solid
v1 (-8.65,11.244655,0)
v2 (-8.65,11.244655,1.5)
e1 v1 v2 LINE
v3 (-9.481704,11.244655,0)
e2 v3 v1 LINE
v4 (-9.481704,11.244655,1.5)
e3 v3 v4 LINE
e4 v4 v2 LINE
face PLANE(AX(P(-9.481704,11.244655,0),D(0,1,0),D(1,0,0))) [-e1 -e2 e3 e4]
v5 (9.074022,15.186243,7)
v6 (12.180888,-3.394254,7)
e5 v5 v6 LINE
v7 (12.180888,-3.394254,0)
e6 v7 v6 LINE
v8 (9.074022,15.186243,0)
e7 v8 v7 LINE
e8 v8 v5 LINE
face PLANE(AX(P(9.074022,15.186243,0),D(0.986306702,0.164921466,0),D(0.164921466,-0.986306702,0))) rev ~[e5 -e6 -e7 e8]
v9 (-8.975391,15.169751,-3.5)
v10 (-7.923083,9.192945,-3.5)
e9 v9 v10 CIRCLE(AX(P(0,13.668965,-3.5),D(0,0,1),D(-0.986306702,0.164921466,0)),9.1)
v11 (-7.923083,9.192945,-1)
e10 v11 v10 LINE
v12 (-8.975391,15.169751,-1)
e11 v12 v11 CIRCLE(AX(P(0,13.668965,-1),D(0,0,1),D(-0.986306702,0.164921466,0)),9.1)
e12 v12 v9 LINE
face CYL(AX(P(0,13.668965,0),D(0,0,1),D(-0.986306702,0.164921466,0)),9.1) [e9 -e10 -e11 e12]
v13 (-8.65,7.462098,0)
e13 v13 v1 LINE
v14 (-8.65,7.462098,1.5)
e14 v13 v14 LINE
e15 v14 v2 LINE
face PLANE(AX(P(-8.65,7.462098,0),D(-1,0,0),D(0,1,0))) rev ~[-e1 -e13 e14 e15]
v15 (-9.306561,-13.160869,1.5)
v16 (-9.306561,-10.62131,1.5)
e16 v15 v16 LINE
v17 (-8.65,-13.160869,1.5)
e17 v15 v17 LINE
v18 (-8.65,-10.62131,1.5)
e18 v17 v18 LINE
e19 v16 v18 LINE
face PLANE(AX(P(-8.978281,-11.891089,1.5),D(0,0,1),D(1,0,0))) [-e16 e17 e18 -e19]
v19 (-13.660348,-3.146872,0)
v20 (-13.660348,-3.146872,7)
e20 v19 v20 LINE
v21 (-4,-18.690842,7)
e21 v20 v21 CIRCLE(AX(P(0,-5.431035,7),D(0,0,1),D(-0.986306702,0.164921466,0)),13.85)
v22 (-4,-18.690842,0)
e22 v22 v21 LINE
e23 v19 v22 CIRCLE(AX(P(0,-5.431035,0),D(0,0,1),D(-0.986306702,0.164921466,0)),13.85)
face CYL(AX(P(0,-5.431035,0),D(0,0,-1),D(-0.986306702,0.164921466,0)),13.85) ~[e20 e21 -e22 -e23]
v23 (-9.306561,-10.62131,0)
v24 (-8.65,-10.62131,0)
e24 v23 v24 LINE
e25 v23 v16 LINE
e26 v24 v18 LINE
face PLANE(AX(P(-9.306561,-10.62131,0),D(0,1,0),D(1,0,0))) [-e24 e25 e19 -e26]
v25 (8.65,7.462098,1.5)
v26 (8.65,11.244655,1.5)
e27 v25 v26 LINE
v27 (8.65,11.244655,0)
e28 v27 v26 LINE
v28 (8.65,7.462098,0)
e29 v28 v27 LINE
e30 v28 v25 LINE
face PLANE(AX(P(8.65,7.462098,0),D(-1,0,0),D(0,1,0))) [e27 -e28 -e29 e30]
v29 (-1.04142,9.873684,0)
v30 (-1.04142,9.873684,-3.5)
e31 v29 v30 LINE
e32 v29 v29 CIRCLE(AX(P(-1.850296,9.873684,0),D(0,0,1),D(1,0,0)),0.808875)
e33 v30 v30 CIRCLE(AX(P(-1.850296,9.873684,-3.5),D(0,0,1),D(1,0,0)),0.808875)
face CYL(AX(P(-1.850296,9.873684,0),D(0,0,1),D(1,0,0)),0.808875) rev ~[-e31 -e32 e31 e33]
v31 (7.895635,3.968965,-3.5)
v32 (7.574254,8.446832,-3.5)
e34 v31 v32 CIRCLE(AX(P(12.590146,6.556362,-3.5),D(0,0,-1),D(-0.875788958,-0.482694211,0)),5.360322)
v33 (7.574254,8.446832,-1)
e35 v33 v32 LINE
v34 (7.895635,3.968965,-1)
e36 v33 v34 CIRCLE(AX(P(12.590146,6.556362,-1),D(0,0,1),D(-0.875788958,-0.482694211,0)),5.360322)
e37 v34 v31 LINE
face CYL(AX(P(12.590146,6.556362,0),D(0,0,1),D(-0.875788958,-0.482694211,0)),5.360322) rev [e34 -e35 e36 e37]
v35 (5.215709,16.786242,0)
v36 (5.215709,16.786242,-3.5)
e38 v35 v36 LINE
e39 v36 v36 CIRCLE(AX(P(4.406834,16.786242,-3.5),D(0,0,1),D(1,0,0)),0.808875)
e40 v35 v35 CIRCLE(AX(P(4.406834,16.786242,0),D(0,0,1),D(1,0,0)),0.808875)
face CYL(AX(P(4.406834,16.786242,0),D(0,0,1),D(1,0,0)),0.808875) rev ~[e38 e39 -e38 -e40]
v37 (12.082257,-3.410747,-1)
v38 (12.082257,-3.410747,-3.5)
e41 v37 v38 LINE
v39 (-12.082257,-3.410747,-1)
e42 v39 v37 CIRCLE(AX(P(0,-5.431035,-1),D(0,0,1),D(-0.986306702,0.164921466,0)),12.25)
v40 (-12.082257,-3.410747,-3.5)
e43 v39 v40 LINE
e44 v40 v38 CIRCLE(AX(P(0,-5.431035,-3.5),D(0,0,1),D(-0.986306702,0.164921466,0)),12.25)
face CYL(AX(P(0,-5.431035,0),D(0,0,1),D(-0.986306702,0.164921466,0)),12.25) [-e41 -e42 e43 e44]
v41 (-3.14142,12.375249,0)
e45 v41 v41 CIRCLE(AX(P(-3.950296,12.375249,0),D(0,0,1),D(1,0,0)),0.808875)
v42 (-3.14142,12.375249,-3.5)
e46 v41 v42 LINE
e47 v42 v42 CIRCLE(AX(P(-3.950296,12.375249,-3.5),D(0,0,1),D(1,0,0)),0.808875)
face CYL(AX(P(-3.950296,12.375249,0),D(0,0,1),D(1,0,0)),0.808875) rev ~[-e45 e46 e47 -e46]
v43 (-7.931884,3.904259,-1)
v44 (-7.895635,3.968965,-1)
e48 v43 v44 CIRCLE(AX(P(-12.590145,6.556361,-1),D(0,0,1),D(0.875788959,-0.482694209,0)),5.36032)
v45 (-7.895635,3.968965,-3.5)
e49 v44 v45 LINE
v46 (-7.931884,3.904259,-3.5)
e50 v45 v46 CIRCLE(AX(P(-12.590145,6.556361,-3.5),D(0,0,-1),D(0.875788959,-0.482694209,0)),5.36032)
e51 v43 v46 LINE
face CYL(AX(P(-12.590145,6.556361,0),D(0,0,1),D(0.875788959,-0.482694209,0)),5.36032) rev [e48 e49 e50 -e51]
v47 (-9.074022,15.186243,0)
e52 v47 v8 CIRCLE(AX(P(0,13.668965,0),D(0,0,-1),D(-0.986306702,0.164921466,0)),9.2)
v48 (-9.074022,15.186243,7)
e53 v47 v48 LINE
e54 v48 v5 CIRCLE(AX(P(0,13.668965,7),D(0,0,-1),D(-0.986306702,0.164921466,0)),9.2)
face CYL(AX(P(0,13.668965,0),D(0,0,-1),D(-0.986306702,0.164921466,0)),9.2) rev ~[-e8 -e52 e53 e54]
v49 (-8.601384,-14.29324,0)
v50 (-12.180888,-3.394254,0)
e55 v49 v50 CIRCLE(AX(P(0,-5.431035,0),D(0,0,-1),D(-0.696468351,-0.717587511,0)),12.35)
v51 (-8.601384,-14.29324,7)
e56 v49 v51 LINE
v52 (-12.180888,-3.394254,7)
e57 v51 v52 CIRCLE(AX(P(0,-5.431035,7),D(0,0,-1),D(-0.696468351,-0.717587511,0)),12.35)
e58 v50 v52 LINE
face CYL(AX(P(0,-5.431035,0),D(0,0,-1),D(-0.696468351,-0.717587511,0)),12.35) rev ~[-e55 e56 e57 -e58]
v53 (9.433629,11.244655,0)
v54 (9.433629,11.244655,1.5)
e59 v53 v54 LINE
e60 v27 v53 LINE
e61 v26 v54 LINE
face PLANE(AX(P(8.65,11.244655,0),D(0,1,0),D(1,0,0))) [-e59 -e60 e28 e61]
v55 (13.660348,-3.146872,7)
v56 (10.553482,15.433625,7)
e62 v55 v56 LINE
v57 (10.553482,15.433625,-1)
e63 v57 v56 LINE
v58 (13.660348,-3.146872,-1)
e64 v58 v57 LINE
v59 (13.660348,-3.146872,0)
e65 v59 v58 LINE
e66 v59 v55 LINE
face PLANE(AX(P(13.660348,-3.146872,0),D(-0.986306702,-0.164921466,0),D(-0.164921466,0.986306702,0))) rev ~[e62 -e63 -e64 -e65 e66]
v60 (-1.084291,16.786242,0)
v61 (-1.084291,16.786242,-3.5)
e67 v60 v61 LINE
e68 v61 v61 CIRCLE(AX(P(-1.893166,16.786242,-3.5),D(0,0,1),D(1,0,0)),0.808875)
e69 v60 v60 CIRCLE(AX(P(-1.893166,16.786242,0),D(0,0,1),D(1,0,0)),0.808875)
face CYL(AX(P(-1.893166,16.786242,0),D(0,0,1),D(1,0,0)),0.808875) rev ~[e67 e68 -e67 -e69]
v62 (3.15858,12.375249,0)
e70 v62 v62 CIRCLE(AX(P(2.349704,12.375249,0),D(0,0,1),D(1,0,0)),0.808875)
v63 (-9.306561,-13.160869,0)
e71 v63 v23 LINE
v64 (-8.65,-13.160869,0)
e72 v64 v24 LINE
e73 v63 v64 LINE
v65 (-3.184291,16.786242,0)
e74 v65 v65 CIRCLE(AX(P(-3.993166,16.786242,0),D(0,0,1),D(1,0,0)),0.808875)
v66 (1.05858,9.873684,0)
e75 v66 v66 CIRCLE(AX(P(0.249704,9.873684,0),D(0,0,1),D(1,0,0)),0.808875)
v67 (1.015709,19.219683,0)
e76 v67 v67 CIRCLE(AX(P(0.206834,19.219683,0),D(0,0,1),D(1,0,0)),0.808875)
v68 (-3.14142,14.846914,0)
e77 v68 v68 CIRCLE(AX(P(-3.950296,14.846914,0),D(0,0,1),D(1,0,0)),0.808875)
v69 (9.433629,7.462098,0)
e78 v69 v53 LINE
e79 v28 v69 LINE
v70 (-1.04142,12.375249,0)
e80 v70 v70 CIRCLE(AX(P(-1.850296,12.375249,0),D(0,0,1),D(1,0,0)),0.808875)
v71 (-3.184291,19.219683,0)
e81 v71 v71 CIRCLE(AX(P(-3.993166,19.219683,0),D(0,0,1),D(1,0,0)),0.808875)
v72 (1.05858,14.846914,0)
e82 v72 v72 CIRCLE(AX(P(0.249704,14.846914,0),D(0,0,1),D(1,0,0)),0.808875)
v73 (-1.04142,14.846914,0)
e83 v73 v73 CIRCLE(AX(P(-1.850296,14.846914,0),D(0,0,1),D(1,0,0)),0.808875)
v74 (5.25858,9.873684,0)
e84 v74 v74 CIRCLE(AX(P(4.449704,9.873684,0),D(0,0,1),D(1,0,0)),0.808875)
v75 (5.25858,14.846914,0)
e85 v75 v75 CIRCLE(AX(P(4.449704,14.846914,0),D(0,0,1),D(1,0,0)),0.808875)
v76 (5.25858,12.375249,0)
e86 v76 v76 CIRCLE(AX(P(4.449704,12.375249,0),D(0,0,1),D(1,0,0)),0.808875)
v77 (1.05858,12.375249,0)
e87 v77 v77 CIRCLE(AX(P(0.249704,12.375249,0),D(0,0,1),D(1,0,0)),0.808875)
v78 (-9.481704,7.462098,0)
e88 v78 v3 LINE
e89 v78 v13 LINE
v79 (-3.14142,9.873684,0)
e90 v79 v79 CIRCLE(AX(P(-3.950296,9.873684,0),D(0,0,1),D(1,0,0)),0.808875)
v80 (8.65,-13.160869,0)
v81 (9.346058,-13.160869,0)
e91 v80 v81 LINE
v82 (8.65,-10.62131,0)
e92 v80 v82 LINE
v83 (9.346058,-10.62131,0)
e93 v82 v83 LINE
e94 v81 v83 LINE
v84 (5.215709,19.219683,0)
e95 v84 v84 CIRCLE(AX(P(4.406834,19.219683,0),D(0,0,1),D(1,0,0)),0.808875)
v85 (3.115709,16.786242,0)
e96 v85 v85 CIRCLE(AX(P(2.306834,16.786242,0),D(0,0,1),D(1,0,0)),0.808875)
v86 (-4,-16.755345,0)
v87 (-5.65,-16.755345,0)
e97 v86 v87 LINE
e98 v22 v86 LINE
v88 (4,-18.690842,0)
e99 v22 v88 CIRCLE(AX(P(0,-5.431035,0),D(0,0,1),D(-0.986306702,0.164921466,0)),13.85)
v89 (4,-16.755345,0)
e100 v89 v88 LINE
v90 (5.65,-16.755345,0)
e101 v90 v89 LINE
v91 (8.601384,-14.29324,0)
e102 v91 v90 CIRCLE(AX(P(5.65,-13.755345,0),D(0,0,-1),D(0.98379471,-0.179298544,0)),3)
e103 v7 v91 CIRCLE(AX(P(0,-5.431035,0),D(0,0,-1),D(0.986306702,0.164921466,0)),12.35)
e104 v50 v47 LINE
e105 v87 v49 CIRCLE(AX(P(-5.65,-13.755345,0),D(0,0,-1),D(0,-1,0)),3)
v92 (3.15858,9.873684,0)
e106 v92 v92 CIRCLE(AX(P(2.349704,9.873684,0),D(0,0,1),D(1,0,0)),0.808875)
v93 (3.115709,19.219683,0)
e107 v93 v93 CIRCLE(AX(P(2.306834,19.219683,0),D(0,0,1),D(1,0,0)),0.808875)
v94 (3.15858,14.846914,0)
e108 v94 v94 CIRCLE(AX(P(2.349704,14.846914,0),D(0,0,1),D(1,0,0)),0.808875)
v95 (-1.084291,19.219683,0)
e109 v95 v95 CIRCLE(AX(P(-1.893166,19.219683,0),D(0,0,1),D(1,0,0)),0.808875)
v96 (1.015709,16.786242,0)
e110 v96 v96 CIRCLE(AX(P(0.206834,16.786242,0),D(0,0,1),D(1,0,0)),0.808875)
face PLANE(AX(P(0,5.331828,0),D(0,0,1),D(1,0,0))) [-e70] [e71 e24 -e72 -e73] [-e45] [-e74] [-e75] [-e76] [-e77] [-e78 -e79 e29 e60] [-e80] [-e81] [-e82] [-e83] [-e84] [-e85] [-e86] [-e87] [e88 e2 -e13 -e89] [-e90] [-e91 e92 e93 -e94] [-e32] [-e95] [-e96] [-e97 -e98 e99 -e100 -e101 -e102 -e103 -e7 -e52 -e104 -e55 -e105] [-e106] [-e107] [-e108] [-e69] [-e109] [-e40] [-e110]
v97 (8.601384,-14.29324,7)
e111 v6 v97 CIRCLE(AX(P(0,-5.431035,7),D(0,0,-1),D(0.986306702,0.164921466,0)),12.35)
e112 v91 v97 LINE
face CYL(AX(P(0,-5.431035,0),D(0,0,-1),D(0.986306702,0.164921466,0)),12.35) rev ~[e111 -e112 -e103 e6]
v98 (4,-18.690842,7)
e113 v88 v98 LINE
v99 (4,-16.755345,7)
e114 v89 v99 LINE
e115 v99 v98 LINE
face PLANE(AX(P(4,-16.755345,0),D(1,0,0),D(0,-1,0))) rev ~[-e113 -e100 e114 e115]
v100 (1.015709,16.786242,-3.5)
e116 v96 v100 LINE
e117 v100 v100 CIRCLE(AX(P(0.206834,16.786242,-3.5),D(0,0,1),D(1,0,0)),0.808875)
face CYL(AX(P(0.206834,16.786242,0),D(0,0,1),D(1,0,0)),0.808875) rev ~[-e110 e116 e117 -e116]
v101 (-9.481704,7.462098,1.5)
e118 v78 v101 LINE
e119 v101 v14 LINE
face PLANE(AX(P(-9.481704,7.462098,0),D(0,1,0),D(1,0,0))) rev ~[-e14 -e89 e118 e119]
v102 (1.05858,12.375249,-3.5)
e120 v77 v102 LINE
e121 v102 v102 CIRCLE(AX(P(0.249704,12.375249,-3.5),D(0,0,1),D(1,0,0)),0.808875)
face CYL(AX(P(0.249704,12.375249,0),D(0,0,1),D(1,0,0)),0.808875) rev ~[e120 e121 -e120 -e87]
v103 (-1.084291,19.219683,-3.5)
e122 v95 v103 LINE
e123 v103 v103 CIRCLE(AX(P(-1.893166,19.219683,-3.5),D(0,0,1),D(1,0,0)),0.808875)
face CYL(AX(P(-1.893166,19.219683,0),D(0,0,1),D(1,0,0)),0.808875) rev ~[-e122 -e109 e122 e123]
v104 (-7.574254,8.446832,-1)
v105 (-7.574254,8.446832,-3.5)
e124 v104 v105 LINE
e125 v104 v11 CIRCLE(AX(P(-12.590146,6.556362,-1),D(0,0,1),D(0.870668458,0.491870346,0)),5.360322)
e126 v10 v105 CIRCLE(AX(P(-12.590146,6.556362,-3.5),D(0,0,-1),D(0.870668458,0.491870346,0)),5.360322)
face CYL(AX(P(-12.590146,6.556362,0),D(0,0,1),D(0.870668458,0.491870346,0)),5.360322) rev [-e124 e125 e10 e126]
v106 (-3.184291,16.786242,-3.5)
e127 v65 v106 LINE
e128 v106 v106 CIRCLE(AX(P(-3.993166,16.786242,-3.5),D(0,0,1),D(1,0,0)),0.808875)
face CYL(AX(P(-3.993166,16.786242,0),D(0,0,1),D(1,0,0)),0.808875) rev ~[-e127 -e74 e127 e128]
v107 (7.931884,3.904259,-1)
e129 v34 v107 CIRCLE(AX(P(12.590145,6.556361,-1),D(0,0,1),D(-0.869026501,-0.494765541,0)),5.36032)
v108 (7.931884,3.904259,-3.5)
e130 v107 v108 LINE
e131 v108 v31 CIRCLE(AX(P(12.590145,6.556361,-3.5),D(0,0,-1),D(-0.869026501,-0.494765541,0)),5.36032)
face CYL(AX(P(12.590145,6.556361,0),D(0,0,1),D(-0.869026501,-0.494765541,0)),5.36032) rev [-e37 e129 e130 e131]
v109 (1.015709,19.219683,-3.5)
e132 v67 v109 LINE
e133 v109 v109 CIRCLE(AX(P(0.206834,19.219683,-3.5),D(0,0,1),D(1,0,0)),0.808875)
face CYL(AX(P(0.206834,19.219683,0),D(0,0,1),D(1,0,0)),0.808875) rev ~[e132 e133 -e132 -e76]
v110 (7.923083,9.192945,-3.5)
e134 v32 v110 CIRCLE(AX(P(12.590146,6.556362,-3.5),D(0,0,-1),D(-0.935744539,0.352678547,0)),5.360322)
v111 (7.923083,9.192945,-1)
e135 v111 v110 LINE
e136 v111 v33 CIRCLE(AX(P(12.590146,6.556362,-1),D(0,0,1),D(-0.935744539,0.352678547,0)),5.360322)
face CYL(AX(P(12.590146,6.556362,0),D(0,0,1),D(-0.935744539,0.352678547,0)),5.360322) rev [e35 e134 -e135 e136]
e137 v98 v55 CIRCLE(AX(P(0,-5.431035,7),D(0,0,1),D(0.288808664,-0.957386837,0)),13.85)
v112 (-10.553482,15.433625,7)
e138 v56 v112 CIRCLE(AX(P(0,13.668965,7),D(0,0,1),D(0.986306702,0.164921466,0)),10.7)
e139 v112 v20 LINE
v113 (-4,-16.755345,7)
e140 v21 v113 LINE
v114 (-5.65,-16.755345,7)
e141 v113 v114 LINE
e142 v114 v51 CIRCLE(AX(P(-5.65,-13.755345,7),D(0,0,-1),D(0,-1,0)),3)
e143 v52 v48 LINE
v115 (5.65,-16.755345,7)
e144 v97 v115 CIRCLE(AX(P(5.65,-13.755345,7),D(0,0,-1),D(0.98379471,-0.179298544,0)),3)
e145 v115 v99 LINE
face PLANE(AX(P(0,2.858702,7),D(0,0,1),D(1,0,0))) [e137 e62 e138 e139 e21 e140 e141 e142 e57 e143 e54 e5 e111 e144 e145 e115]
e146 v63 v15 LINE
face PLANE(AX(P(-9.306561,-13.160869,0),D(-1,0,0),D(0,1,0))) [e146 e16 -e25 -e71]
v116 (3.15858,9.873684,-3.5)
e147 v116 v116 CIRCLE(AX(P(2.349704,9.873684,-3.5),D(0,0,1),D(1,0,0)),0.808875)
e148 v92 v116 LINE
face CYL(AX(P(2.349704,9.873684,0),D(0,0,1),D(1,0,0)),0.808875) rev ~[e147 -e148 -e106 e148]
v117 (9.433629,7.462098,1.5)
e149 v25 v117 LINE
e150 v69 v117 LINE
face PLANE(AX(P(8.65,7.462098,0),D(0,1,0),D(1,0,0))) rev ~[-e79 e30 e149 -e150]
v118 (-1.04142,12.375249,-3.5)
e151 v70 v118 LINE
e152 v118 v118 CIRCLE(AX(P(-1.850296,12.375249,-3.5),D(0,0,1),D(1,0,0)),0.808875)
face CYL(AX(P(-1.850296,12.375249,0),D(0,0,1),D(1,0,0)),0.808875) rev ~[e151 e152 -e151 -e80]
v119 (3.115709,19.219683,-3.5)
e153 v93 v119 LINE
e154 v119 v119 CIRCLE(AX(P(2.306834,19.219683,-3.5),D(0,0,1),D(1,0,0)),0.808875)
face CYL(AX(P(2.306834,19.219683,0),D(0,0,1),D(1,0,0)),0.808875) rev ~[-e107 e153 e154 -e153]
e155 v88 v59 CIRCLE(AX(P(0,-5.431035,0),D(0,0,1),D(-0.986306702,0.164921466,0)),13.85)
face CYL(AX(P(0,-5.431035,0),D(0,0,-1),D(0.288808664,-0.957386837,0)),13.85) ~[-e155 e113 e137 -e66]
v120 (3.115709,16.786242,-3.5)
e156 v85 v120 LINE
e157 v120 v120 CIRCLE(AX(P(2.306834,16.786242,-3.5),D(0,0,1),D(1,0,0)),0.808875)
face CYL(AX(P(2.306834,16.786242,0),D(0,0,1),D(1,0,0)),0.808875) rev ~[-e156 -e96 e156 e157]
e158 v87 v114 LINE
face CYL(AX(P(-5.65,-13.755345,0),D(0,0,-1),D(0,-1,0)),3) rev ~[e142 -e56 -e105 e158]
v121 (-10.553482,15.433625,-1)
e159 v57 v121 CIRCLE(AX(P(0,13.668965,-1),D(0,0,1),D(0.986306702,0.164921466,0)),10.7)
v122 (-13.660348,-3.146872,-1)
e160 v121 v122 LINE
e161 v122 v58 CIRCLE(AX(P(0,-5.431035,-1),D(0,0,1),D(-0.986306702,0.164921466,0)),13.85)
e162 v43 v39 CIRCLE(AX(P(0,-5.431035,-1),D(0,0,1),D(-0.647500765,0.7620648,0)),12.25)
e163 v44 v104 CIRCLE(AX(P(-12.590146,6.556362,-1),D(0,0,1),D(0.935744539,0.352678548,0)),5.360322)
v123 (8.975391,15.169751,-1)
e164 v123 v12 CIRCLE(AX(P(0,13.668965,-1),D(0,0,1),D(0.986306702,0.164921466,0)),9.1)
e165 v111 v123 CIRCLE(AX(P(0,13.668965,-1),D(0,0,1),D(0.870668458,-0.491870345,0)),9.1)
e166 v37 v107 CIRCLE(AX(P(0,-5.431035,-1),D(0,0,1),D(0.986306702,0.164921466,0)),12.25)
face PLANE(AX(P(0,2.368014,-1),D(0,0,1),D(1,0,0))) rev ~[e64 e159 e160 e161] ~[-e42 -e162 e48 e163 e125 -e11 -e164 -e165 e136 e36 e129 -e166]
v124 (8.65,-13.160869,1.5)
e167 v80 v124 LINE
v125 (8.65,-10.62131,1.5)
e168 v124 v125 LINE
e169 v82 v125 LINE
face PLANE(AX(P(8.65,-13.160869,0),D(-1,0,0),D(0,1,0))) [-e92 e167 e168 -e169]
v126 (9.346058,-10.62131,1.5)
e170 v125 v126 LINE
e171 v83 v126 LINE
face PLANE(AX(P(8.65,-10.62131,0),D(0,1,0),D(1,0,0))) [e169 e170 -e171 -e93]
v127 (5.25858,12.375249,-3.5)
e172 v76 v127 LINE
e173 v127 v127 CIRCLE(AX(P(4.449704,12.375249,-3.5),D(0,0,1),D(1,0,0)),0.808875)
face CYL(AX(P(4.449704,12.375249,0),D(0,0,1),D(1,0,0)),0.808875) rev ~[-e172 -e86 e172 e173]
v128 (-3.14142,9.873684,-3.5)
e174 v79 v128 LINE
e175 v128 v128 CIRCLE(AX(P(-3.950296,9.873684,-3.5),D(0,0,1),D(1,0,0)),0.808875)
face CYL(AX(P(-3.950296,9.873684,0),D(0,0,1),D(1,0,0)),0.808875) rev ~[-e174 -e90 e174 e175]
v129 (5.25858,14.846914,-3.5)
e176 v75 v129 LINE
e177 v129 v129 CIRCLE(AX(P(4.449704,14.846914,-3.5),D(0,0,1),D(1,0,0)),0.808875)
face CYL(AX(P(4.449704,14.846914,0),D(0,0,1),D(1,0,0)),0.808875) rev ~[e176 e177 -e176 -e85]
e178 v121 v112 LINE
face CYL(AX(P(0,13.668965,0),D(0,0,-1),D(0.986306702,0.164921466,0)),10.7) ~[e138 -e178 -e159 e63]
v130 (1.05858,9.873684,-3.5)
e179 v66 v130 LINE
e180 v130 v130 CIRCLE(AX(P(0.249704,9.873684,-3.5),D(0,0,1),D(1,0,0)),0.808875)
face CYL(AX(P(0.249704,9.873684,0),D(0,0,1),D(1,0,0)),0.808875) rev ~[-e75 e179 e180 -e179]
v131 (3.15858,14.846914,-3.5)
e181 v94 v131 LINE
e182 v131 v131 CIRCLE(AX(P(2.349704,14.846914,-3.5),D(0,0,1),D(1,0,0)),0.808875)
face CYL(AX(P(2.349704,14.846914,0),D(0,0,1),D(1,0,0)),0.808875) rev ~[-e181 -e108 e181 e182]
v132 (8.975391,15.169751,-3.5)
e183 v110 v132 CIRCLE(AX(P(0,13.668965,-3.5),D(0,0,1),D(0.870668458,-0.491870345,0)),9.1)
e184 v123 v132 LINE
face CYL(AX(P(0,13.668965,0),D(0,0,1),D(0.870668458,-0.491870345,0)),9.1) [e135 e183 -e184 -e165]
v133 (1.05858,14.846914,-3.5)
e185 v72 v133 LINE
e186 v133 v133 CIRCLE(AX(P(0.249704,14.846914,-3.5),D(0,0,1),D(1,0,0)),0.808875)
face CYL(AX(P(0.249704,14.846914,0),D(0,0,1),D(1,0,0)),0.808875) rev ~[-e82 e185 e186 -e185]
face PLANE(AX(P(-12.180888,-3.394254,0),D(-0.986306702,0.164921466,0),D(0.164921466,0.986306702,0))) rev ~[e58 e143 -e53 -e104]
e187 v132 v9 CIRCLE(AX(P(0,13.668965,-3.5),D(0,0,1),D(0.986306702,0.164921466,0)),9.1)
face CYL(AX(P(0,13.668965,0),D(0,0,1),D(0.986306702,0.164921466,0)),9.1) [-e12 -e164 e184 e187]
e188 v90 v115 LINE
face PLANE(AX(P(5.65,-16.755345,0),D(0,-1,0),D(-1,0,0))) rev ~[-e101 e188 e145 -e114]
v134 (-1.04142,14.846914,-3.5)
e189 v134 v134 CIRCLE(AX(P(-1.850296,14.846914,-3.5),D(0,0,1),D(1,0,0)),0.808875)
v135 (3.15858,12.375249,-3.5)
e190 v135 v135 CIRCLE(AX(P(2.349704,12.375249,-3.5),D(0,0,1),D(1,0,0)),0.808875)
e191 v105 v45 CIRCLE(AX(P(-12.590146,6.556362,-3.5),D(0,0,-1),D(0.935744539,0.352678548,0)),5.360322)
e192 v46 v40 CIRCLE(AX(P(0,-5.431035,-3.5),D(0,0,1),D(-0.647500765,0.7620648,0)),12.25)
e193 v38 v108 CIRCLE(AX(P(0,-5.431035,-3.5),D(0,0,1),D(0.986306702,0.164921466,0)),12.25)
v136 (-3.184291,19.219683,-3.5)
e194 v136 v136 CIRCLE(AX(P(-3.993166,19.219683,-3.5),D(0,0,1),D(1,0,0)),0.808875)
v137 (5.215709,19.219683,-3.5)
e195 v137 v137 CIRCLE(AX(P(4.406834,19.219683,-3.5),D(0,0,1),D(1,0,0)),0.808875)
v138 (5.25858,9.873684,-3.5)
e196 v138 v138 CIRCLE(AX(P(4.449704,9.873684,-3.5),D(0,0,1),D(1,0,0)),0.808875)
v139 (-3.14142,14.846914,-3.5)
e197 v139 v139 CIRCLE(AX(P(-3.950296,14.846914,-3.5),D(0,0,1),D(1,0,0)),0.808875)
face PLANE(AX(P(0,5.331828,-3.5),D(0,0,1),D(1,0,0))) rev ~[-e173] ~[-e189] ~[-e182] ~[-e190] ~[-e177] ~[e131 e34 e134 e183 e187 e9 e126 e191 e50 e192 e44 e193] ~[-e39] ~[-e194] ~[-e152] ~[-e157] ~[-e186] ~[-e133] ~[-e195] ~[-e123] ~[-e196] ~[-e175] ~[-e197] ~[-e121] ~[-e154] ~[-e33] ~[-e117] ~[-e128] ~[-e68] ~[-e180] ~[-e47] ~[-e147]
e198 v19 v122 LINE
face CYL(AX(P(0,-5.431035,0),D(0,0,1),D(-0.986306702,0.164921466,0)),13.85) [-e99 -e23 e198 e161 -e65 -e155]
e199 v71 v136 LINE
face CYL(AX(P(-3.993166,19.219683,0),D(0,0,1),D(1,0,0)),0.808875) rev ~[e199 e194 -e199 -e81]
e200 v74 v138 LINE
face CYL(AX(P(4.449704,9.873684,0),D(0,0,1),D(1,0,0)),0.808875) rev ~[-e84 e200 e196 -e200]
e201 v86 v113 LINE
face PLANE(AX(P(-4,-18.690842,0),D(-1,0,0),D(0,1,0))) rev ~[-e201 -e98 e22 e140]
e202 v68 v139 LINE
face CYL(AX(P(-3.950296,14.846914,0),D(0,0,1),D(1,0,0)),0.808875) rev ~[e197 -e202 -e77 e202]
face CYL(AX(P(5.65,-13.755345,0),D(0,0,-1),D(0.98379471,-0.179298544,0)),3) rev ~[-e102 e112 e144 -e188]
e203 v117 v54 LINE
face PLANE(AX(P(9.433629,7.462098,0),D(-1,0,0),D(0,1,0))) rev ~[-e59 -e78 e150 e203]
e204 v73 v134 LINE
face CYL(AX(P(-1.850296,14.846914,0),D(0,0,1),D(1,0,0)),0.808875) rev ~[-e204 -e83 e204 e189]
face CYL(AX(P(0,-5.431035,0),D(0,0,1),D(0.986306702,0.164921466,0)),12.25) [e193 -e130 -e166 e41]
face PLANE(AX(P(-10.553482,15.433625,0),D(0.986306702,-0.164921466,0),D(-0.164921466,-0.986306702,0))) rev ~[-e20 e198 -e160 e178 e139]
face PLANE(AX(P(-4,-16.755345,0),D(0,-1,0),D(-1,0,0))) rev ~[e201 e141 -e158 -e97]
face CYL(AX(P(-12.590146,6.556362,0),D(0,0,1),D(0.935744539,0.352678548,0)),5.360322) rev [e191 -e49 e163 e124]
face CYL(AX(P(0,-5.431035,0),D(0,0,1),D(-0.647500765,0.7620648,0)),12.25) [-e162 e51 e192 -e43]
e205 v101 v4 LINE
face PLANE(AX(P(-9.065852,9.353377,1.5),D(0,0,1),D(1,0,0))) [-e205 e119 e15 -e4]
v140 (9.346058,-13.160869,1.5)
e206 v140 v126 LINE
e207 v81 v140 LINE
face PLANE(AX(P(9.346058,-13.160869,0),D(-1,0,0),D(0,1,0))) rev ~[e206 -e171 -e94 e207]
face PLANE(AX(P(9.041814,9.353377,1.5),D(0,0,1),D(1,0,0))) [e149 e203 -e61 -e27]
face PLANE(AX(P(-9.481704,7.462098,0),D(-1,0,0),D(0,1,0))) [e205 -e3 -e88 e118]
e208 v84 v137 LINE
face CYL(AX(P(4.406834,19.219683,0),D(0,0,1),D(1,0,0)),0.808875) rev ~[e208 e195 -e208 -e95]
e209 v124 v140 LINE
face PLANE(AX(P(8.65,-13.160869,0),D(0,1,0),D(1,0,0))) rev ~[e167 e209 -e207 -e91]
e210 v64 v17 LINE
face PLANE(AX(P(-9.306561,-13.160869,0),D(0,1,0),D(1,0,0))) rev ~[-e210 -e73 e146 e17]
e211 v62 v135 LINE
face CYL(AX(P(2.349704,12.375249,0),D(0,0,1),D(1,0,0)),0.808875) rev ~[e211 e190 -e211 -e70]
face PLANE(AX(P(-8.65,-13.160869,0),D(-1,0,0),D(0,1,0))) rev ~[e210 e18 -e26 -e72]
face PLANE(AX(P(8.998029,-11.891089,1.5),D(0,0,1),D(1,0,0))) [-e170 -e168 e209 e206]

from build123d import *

# Parameters (mm, degrees)
F1_DEPTH = 1
F2_DEPTH = 3.5
F4_DEPTH = 7
F3_W     = 0.8317038625
F3_H     = 3.7825570011
F3_W_2   = 0.7836289912
F3_W_3   = 0.6960576609
F3_H_2   = 2.5395583361
F3_W_4   = 0.6565612018
F5_DEPTH = 1.5
F3_R     = 0.8088750424
F6_DEPTH = 5


with BuildPart() as f1:
    # F0 (on Top) → F1 (new body)
    with BuildSketch(Plane.XY):
        with BuildLine():
            ThreePointArc((10.5534817095, 15.4336250836), (0, 24.3689653978), (-10.5534817095, 15.4336250836))
            Line((-10.5534817095, 15.4336250836), (-13.6603478203, -3.1468722986))
            ThreePointArc((-13.6603478203, -3.1468722986), (0, -19.2810346022), (13.6603478203, -3.1468722986))
            Line((13.6603478203, -3.1468722986), (10.5534817095, 15.4336250836))
        make_face()
        with BuildLine():
            ThreePointArc((-7.9318843768, 3.9042591925), (-7.9136479922, 3.9365495997), (-7.8956354366, 3.9689653978))
            ThreePointArc((-7.8956354366, 3.9689653978), (-7.2435768772, 6.1726329025), (-7.5742542147, 8.4468323957))
            ThreePointArc((-7.5742542147, 8.4468323957), (-7.7343170695, 8.8265985648), (-7.9230829656, 9.1929452547))
            ThreePointArc((-7.9230829656, 9.1929452547), (-8.9621513279, 12.0910415797), (-8.9753909866, 15.1697507381))
            ThreePointArc((-8.9753909866, 15.1697507381), (0, 22.7689653978), (8.9753909866, 15.1697507381))
            ThreePointArc((8.9753909866, 15.1697507381), (8.9621513279, 12.0910415797), (7.9230829656, 9.1929452547))
            ThreePointArc((7.9230829656, 9.1929452547), (7.7343170695, 8.8265985648), (7.5742542147, 8.4468323957))
            ThreePointArc((7.5742542147, 8.4468323957), (7.2435768772, 6.1726329025), (7.8956354366, 3.9689653978))
            ThreePointArc((7.8956354366, 3.9689653978), (7.9136479922, 3.9365495997), (7.9318843768, 3.9042591925))
            ThreePointArc((7.9318843768, 3.9042591925), (10.6545198078, 0.6141045745), (12.0822570973, -3.4107466441))
            ThreePointArc((12.0822570973, -3.4107466441), (0, -17.6810346022), (-12.0822570973, -3.4107466441))
            ThreePointArc((-12.0822570973, -3.4107466441), (-10.6545198078, 0.6141045745), (-7.9318843768, 3.9042591925))
        make_face(mode=Mode.SUBTRACT)
        with BuildLine():
            Line((7.8956354366, 3.9689653978), (-7.8956354366, 3.9689653978))
            ThreePointArc((-7.8956354366, 3.9689653978), (-7.9136479922, 3.9365495997), (-7.9318843768, 3.9042591925))
            ThreePointArc((-7.9318843768, 3.9042591925), (-10.6545198078, 0.6141045745), (-12.0822570973, -3.4107466441))
            ThreePointArc((-12.0822570973, -3.4107466441), (0, -17.6810346022), (12.0822570973, -3.4107466441))
            ThreePointArc((12.0822570973, -3.4107466441), (10.6545198078, 0.6141045745), (7.9318843768, 3.9042591925))
            ThreePointArc((7.9318843768, 3.9042591925), (7.9136479922, 3.9365495997), (7.8956354366, 3.9689653978))
        make_face()
        with BuildLine():
            ThreePointArc((-7.9230829656, 9.1929452547), (-7.7343170695, 8.8265985648), (-7.5742542147, 8.4468323957))
            ThreePointArc((-7.5742542147, 8.4468323957), (0, 4.4689653978), (7.5742542147, 8.4468323957))
            ThreePointArc((7.5742542147, 8.4468323957), (7.7343170695, 8.8265985648), (7.9230829656, 9.1929452547))
            ThreePointArc((7.9230829656, 9.1929452547), (8.9621513279, 12.0910415797), (8.9753909866, 15.1697507381))
            ThreePointArc((8.9753909866, 15.1697507381), (0, 22.7689653978), (-8.9753909866, 15.1697507381))
            ThreePointArc((-8.9753909866, 15.1697507381), (-8.9621513279, 12.0910415797), (-7.9230829656, 9.1929452547))
        make_face()
        with BuildLine():
            ThreePointArc((-7.5742542147, 8.4468323957), (-7.2435768772, 6.1726329025), (-7.8956354366, 3.9689653978))
            Line((-7.8956354366, 3.9689653978), (7.8956354366, 3.9689653978))
            ThreePointArc((7.8956354366, 3.9689653978), (7.2435768772, 6.1726329025), (7.5742542147, 8.4468323957))
            ThreePointArc((7.5742542147, 8.4468323957), (0, 4.4689653978), (-7.5742542147, 8.4468323957))
        make_face()
    extrude(amount=-F1_DEPTH)

    # F0 (on Top) → F2 (join)
    with BuildSketch(Plane.XY):
        with BuildLine():
            ThreePointArc((-7.5742542147, 8.4468323957), (-7.2435768772, 6.1726329025), (-7.8956354366, 3.9689653978))
            Line((-7.8956354366, 3.9689653978), (7.8956354366, 3.9689653978))
            ThreePointArc((7.8956354366, 3.9689653978), (7.2435768772, 6.1726329025), (7.5742542147, 8.4468323957))
            ThreePointArc((7.5742542147, 8.4468323957), (0, 4.4689653978), (-7.5742542147, 8.4468323957))
        make_face()
        with BuildLine():
            Line((7.8956354366, 3.9689653978), (-7.8956354366, 3.9689653978))
            ThreePointArc((-7.8956354366, 3.9689653978), (-7.9136479922, 3.9365495997), (-7.9318843768, 3.9042591925))
            ThreePointArc((-7.9318843768, 3.9042591925), (-10.6545198078, 0.6141045745), (-12.0822570973, -3.4107466441))
            ThreePointArc((-12.0822570973, -3.4107466441), (0, -17.6810346022), (12.0822570973, -3.4107466441))
            ThreePointArc((12.0822570973, -3.4107466441), (10.6545198078, 0.6141045745), (7.9318843768, 3.9042591925))
            ThreePointArc((7.9318843768, 3.9042591925), (7.9136479922, 3.9365495997), (7.8956354366, 3.9689653978))
        make_face()
        with BuildLine():
            ThreePointArc((-7.9230829656, 9.1929452547), (-7.7343170695, 8.8265985648), (-7.5742542147, 8.4468323957))
            ThreePointArc((-7.5742542147, 8.4468323957), (0, 4.4689653978), (7.5742542147, 8.4468323957))
            ThreePointArc((7.5742542147, 8.4468323957), (7.7343170695, 8.8265985648), (7.9230829656, 9.1929452547))
            ThreePointArc((7.9230829656, 9.1929452547), (8.9621513279, 12.0910415797), (8.9753909866, 15.1697507381))
            ThreePointArc((8.9753909866, 15.1697507381), (0, 22.7689653978), (-8.9753909866, 15.1697507381))
            ThreePointArc((-8.9753909866, 15.1697507381), (-8.9621513279, 12.0910415797), (-7.9230829656, 9.1929452547))
        make_face()
    extrude(amount=-F2_DEPTH)

    # F3 (on face) → F4 (join)
    with BuildSketch(Plane.XY):
        with BuildLine():
            Line((-4, -16.7553447357), (-5.65, -16.7553447357))
            ThreePointArc((-5.65, -16.7553447357), (-7.5717587133, -16.0590034448), (-8.6013841311, -14.2932403677))
            ThreePointArc((-8.6013841311, -14.2932403677), (-11.7334001707, -9.284581077), (-12.1808877675, -3.3942544975))
            Line((-12.1808877675, -3.3942544975), (-9.0740216568, 15.1862428847))
            ThreePointArc((-9.0740216568, 15.1862428847), (0, 22.8689653978), (9.0740216568, 15.1862428847))
            Line((9.0740216568, 15.1862428847), (12.1808877675, -3.3942544975))
            ThreePointArc((12.1808877675, -3.3942544975), (11.7334001707, -9.284581077), (8.6013841311, -14.2932403677))
            ThreePointArc((8.6013841311, -14.2932403677), (7.5717587133, -16.0590034448), (5.65, -16.7553447357))
            Line((5.65, -16.7553447357), (4, -16.7553447357))
            Line((4, -16.7553447357), (4, -17.9553447357))
            Line((4, -17.9553447357), (4, -18.6908422931))
            ThreePointArc((4, -18.6908422931), (11.7633210481, -12.7417649295), (13.6603478203, -3.1468722986))
            Line((13.6603478203, -3.1468722986), (10.5534817095, 15.4336250836))
            ThreePointArc((10.5534817095, 15.4336250836), (0, 24.3689653978), (-10.5534817095, 15.4336250836))
            Line((-10.5534817095, 15.4336250836), (-13.6603478203, -3.1468722986))
            ThreePointArc((-13.6603478203, -3.1468722986), (-11.7633210481, -12.7417649295), (-4, -18.6908422931))
            Line((-4, -18.6908422931), (-4, -17.9553447357))
            Line((-4, -17.9553447357), (-4, -16.7553447357))
        make_face()
    extrude(amount=F4_DEPTH)

    # F3 (on face) → F5 (join)
    with BuildSketch(Plane.XY):
        with Locations((-9.0658519313, 9.3533767637)):
            Rectangle(F3_W, F3_H)
        with Locations((9.0418144956, 9.3533767637)):
            Rectangle(F3_W_2, F3_H)
        with Locations((8.9980288304, -11.8910893798)):
            Rectangle(F3_W_3, F3_H_2)
        with Locations((-8.9782806009, -11.8910893798)):
            Rectangle(F3_W_4, F3_H_2)
    extrude(amount=F5_DEPTH)

    # F3 (on face) → F6 (cut)
    with BuildSketch(Plane.XY):
        with Locations((-3.9931656793, 19.2196834832)):
            Circle(F3_R)
        with Locations((-1.8931656793, 19.2196834832)):
            Circle(F3_R)
        with Locations((0.2068343207, 19.2196834832)):
            Circle(F3_R)
        with Locations((2.3068343207, 19.2196834832)):
            Circle(F3_R)
        with Locations((4.4068343207, 19.2196834832)):
            Circle(F3_R)
        with Locations((4.4068343207, 16.7862419039)):
            Circle(F3_R)
        with Locations((2.3068343207, 16.7862419039)):
            Circle(F3_R)
        with Locations((0.2068343207, 16.7862419039)):
            Circle(F3_R)
        with Locations((-1.8931656793, 16.7862419039)):
            Circle(F3_R)
        with Locations((-3.9931656793, 16.7862419039)):
            Circle(F3_R)
        with Locations((-3.9502955042, 14.8469135165)):
            Circle(F3_R)
        with Locations((-1.8502955042, 14.8469135165)):
            Circle(F3_R)
        with Locations((0.2497044958, 14.8469135165)):
            Circle(F3_R)
        with Locations((2.3497044958, 14.8469135165)):
            Circle(F3_R)
        with Locations((4.4497044958, 14.8469135165)):
            Circle(F3_R)
        with Locations((-3.9502955042, 12.3752485961)):
            Circle(F3_R)
        with Locations((-1.8502955042, 12.3752485961)):
            Circle(F3_R)
        with Locations((0.2497044958, 12.3752485961)):
            Circle(F3_R)
        with Locations((2.3497044958, 12.3752485961)):
            Circle(F3_R)
        with Locations((4.4497044958, 12.3752485961)):
            Circle(F3_R)
        with Locations((-3.9502955042, 9.8736844957)):
            Circle(F3_R)
        with Locations((-1.8502955042, 9.8736844957)):
            Circle(F3_R)
        with Locations((0.2497044958, 9.8736844957)):
            Circle(F3_R)
        with Locations((2.3497044958, 9.8736844957)):
            Circle(F3_R)
        with Locations((4.4497044958, 9.8736844957)):
            Circle(F3_R)
    extrude(amount=-F6_DEPTH, mode=Mode.SUBTRACT)


solid = f1.part
